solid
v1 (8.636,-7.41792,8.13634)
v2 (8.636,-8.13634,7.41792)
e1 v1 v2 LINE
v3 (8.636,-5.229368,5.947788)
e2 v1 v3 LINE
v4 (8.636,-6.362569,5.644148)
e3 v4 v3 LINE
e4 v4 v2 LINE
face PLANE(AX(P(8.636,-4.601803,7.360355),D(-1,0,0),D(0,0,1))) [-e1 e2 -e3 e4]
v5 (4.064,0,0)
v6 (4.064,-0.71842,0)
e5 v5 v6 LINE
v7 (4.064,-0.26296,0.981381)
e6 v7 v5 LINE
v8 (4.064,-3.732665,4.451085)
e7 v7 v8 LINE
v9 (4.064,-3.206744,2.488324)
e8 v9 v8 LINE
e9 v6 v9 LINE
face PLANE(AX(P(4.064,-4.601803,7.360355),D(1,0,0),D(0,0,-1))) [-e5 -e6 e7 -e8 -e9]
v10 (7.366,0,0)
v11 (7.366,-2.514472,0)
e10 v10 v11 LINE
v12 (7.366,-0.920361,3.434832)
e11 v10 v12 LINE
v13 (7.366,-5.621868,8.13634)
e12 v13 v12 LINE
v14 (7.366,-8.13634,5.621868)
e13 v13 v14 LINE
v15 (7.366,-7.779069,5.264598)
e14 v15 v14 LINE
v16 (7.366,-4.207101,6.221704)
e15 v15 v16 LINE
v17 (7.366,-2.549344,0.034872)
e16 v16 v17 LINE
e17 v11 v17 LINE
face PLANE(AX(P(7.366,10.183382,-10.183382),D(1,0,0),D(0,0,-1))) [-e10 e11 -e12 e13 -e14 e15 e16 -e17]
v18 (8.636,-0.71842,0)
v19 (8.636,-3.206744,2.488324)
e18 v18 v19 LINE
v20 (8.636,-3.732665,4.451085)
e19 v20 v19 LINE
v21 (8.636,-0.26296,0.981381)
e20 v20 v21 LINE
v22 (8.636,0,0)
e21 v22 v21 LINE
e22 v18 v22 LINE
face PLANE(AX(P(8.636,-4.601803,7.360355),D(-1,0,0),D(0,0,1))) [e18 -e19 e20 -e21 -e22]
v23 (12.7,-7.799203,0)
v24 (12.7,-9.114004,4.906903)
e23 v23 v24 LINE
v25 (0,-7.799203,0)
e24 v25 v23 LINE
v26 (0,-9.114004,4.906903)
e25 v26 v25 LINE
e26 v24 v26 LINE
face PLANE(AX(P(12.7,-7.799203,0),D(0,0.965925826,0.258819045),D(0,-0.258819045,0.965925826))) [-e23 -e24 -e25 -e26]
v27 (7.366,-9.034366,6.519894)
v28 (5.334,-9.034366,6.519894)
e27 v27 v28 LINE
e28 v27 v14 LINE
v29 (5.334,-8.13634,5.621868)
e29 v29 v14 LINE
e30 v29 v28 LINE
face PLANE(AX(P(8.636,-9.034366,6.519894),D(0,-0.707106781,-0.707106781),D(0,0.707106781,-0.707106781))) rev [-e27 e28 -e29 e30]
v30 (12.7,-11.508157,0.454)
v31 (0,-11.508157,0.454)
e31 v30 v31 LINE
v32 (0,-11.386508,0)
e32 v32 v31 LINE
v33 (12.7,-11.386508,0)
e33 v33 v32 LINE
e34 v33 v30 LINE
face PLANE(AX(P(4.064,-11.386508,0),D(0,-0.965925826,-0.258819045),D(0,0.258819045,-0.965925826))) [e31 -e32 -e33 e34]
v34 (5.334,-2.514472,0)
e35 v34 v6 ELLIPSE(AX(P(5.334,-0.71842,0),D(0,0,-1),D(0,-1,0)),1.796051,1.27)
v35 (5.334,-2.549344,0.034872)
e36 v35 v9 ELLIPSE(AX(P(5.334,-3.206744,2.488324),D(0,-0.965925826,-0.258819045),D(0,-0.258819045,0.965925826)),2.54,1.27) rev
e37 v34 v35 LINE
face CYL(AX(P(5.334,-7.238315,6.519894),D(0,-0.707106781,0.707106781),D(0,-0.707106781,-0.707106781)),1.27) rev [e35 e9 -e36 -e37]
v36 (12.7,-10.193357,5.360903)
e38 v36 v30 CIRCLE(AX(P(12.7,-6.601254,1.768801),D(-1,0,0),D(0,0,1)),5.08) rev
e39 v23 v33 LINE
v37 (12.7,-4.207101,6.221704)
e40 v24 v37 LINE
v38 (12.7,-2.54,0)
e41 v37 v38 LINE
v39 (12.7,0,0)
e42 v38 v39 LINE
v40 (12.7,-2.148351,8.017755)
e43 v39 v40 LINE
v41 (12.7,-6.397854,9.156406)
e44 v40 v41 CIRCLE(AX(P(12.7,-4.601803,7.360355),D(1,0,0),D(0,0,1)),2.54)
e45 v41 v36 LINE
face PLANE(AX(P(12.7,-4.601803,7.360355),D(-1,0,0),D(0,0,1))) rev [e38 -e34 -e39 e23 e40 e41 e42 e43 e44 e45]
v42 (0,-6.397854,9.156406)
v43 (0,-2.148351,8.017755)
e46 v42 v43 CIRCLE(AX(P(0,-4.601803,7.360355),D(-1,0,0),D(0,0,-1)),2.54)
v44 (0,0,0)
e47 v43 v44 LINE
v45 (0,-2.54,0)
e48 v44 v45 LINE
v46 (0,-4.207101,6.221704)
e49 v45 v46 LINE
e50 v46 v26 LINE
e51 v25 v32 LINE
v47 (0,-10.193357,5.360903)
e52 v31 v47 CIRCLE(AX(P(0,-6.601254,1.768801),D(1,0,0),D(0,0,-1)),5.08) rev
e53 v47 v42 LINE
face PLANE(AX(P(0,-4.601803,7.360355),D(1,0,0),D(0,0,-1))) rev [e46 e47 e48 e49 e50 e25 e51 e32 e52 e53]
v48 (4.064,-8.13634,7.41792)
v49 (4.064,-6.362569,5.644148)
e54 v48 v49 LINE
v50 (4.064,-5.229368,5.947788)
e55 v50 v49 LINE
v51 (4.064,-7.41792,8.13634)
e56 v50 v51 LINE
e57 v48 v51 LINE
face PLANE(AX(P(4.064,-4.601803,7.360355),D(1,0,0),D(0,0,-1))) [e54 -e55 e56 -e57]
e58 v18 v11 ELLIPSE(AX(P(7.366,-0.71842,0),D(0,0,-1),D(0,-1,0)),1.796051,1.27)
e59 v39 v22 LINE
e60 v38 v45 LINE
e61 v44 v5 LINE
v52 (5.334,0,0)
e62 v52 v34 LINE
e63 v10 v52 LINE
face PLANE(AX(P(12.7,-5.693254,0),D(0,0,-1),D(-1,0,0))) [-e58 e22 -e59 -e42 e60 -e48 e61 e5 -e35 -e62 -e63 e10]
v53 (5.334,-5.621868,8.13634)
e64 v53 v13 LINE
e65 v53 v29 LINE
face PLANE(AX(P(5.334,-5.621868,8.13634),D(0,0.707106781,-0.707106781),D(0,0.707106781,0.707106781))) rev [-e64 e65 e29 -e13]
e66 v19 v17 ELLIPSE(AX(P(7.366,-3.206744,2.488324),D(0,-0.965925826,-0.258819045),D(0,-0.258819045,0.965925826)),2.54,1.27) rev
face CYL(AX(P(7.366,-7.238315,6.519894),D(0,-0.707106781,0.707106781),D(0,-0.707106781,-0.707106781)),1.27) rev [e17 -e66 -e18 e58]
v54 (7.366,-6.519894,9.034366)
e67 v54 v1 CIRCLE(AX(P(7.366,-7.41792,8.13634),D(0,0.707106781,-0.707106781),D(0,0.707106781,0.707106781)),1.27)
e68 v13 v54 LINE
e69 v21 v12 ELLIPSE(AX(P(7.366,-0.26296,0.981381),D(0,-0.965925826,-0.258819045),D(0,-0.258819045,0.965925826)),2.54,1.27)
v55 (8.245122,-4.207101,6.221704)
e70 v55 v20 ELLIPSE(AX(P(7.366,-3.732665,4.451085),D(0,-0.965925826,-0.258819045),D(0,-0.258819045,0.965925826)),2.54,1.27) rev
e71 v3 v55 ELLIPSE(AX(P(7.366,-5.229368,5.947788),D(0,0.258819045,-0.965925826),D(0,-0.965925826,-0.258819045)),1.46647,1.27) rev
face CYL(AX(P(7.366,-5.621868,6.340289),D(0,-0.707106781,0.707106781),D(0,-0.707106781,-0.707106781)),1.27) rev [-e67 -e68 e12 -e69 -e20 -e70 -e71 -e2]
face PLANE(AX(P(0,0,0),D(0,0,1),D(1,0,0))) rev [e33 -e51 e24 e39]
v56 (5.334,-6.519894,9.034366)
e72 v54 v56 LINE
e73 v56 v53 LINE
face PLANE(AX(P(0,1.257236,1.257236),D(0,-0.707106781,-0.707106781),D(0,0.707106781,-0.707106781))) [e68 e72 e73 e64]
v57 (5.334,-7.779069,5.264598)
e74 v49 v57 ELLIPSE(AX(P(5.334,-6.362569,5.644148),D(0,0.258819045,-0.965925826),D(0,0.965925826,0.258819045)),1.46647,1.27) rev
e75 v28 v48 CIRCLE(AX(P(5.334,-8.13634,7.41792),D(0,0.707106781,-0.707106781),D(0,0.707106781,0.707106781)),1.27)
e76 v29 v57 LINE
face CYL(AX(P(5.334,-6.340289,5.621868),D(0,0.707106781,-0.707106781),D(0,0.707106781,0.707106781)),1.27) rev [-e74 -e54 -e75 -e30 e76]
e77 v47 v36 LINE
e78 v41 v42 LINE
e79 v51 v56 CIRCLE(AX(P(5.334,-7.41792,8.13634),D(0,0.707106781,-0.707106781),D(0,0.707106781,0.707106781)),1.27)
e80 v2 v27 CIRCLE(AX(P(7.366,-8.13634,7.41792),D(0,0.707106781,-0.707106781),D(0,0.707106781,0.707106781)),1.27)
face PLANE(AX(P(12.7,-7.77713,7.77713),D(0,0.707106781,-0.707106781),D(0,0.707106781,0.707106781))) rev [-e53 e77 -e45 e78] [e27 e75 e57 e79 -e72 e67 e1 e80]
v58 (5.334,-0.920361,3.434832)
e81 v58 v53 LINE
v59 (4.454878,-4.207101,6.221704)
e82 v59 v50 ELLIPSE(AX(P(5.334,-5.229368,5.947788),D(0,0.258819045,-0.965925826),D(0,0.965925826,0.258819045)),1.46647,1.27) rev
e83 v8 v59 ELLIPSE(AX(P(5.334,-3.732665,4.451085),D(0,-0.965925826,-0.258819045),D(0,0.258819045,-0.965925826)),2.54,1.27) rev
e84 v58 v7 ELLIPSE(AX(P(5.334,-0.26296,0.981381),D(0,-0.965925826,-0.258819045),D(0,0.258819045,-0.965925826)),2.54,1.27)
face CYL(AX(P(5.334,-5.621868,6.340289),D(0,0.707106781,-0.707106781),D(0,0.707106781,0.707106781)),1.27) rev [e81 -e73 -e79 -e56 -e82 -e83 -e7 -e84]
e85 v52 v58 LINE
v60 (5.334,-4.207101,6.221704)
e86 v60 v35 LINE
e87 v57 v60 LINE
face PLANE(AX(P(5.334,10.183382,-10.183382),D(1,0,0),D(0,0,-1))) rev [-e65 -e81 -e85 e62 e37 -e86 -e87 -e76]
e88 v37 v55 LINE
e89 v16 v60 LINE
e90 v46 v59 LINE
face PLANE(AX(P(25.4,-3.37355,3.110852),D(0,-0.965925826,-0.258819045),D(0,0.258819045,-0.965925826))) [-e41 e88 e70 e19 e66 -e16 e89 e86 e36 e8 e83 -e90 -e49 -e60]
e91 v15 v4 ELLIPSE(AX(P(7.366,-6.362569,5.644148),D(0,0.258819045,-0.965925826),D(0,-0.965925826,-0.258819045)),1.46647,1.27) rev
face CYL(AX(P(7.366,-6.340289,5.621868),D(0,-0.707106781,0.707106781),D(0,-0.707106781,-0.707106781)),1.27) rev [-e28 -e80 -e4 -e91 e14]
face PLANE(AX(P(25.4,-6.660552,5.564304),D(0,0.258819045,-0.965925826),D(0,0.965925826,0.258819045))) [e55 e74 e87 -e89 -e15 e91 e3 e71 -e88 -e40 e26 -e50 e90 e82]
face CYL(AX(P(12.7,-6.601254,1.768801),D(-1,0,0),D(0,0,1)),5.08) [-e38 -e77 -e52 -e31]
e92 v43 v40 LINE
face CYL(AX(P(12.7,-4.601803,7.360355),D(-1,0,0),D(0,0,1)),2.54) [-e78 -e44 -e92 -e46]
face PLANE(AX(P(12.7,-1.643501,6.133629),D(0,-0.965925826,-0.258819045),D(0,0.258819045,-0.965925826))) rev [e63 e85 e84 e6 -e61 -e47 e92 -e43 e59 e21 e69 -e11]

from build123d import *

# Parameters (mm, degrees)
BOSS_EXTRUDE1_START   = -3.302
BOSS_EXTRUDE1_DEPTH   = 4.572
BOSS_EXTRUDE1_START_2 = -2.032
BOSS_EXTRUDE1_2_DEPTH = 3.302
BOSS_EXTRUDE1_START_3 = -10.998522628
BOSS_EXTRUDE1_3_DEPTH = 11.998522628
BOSS_EXTRUDE1_4_DEPTH = 3.444411758
SKETCH2_W             = 2.032
SKETCH2_H             = 1.27
CUT_EXTRUDE1_DEPTH    = 3.556
BOSS_EXTRUDE2_DEPTH   = 1.27
BOSS_EXTRUDE3_DEPTH   = 4.064
BOSS_EXTRUDE4_DEPTH   = 1.27
BOSS_EXTRUDE5_START   = 1.27
BOSS_EXTRUDE5_DEPTH   = 1.27
SKETCH7_W             = 8.636
SKETCH7_H             = 3.587305501
BOSS_EXTRUDE6_DEPTH   = 4.16775137
BOSS_EXTRUDE7_START   = 4.064
BOSS_EXTRUDE7_DEPTH   = 4.064
DRAFT1_DEPTH          = 12.7
DRAFT2_START          = -7.533451599
DRAFT2_OUTLINE_W      = 12.7
DRAFT2_OUTLINE_H      = 6.098582272
DRAFT2_DEPTH          = 5.08
FILLET1_R             = 1.27
FILLET2_R             = 5.08


with BuildPart() as part:
    # Boss-Extrude1: read off the stored shape, not the designer's step
    # Boss-Extrude1 outline → Boss-Extrude1 (new body)
    with BuildSketch(Plane(origin=(7.366, 0, 0), x_dir=(0, 0, -1), z_dir=(1, 0, 0)).offset(BOSS_EXTRUDE1_START)):
        with BuildLine():
            Line((-6.519894076, -9.03436579), (-5.264597758, -7.779069472))
            Line((-5.264597758, -7.779069472), (-6.221703947, -4.207100548))
            Line((-6.221703947, -4.207100548), (0, -2.54))
            Line((0, -2.54), (0, 0))
            Line((0, 0), (-8.017755171, -2.148351023))
            ThreePointArc((-8.017755171, -2.148351023), (-9.813806395, -3.944402247), (-9.156406021, -6.397853846))
            Line((-9.156406021, -6.397853846), (-6.519894076, -9.03436579))
        make_face()
    extrude(amount=BOSS_EXTRUDE1_DEPTH)

    # Boss-Extrude1 2 outline → Boss-Extrude1 2 (add)
    with BuildSketch(Plane(origin=(7.366, 0, 0), x_dir=(0, 0, -1), z_dir=(1, 0, 0)).offset(BOSS_EXTRUDE1_START_2)):
        Polygon((-4.16775137, -11.386508497), (-4.16775137, -7.799202996), (-5.259202996, -7.799202996), (-5.264597758, -7.779069472), (-6.519894076, -9.03436579), align=None)
    extrude(amount=BOSS_EXTRUDE1_2_DEPTH)

    # Boss-Extrude1 3 outline → Boss-Extrude1 3 (cut)
    with BuildSketch(Plane(origin=(0, 0, 0), x_dir=(1, 0, 0), z_dir=(0, 0.707106781186548, -0.707106781186547)).offset(BOSS_EXTRUDE1_START_3)):
        with BuildLine():
            Line((7.366, 1.778), (7.366, -6))
            Line((7.366, -6), (8.636000001, -6))
            Line((8.636000001, -6), (8.636000002, -4.490590949))
            Line((8.636000002, -4.490590949), (8.636, 0.508))
            ThreePointArc((8.636, 0.508), (8.264025612, 1.406025612), (7.366, 1.778))
        make_face()
        with BuildLine():
            Line((4.063999999, -6), (5.334, -6))
            Line((5.334, -6), (5.334, 1.778))
            ThreePointArc((5.334, 1.778), (4.435974388, 1.406025612), (4.064, 0.508))
            Line((4.064, 0.508), (4.064, -4.490590949))
            Line((4.064, -4.490590949), (4.063999999, -6))
        make_face()
    extrude(amount=BOSS_EXTRUDE1_3_DEPTH, mode=Mode.SUBTRACT)

    # Boss-Extrude1 4 outline → Boss-Extrude1 4 (cut)
    with BuildSketch(Plane(origin=(0, 0, 0), x_dir=(1, 0, 0), z_dir=(0, 0.707106781186548, -0.707106781186547)).offset(BOSS_EXTRUDE1_START_3)):
        with BuildLine():
            Line((8.636, 1.778), (7.366, 1.778))
            ThreePointArc((7.366, 1.778), (8.264025612, 1.406025612), (8.636, 0.508))
            Line((8.636, 0.508), (8.636, 1.778))
        make_face()
        with BuildLine():
            ThreePointArc((4.064, 0.508), (4.435974388, 1.406025612), (5.334, 1.778))
            Line((5.334, 1.778), (4.064, 1.778))
            Line((4.064, 1.778), (4.064, 0.508))
        make_face()
    extrude(amount=BOSS_EXTRUDE1_4_DEPTH, mode=Mode.SUBTRACT)

    # Sketch2 → Cut-Extrude1 (cut)
    with BuildSketch(Plane(origin=(0, -1.257235857, -1.257235857), x_dir=(1, 0, 0), z_dir=(0, -0.707106781186547, -0.707106781186548))):
        with Locations((6.35, 10.363522628)):
            Rectangle(SKETCH2_W, SKETCH2_H)
    extrude(amount=-CUT_EXTRUDE1_DEPTH, mode=Mode.SUBTRACT)

    # Sketch3 → Boss-Extrude2 (add)
    with BuildSketch(Plane(origin=(7.366, 0, 0), x_dir=(0, 0, -1), z_dir=(1, 0, 0))):
        with BuildLine():
            Line((-3.434832238, -0.920360524), (-9.03436579, -6.519894076))
            Line((-9.03436579, -6.519894076), (-9.156406021, -6.397853846))
            ThreePointArc((-9.156406021, -6.397853846), (-9.813806395, -3.944402247), (-8.017755171, -2.148351023))
            Line((-8.017755171, -2.148351023), (-3.434832238, -0.920360524))
        make_face()
    extrude(amount=BOSS_EXTRUDE2_DEPTH)

    # Sketch4 → Boss-Extrude3 (add)
    with BuildSketch(Plane(origin=(8.636, 0, 0), x_dir=(0, 0, -1), z_dir=(1, 0, 0))):
        with BuildLine():
            Line((-4.16775137, -11.386508497), (-9.156406021, -6.397853846))
            ThreePointArc((-9.156406021, -6.397853846), (-9.813806395, -3.944402247), (-8.017755171, -2.148351023))
            Line((-8.017755171, -2.148351023), (0, 0))
            Line((0, 0), (0, -2.54))
            Line((0, -2.54), (-6.221703947, -4.207100548))
            Line((-6.221703947, -4.207100548), (-5.259202996, -7.799202996))
            Line((-5.259202996, -7.799202996), (-4.16775137, -7.799202996))
            Line((-4.16775137, -7.799202996), (-4.16775137, -11.386508497))
        make_face()
    extrude(amount=BOSS_EXTRUDE3_DEPTH)

    # Sketch5 → Boss-Extrude4 (add)
    with BuildSketch(Plane.ZY.offset(-5.334)):
        Polygon((4.16775137, -11.386508497), (4.16775137, -7.799202996), (5.259202996, -7.799202996), (5.264597758, -7.779069472), (6.519894076, -9.03436579), align=None)
    extrude(amount=BOSS_EXTRUDE4_DEPTH)

    # Sketch6 → Boss-Extrude5 (add)
    with BuildSketch(Plane.ZY.offset(-5.334).offset(BOSS_EXTRUDE5_START)):
        with BuildLine():
            Line((9.156406021, -6.397853846), (9.03436579, -6.519894076))
            Line((9.03436579, -6.519894076), (3.434832238, -0.920360524))
            Line((3.434832238, -0.920360524), (8.017755171, -2.148351023))
            ThreePointArc((8.017755171, -2.148351023), (9.813806395, -3.944402247), (9.156406021, -6.397853846))
        make_face()
    extrude(amount=-BOSS_EXTRUDE5_DEPTH)

    # Sketch7 → Boss-Extrude6 (add)
    with BuildSketch(Plane(origin=(0, 0, 4.16775137), x_dir=(-1, 0, 0), z_dir=(0, 0, -1))):
        with Locations((-8.382, -9.592855747)):
            Rectangle(SKETCH7_W, SKETCH7_H)
    extrude(amount=BOSS_EXTRUDE6_DEPTH)

    # Sketch8 → Boss-Extrude7 (add)
    with BuildSketch(Plane.ZY.offset(-4.064).offset(BOSS_EXTRUDE7_START)):
        with BuildLine():
            Line((4.16775137, -11.386508497), (0, -11.386508497))
            Line((0, -11.386508497), (0, -7.799202996))
            Line((0, -7.799202996), (5.259202996, -7.799202996))
            Line((5.259202996, -7.799202996), (6.221703947, -4.207100548))
            Line((6.221703947, -4.207100548), (0, -2.54))
            Line((0, -2.54), (0, 0))
            Line((0, 0), (8.017755171, -2.148351023))
            ThreePointArc((8.017755171, -2.148351023), (9.813806395, -3.944402247), (9.156406021, -6.397853846))
            Line((9.156406021, -6.397853846), (4.16775137, -11.386508497))
        make_face()
    extrude(amount=-BOSS_EXTRUDE7_DEPTH)

    # Draft1: read off the stored shape, not the designer's step
    # Draft1 outline → Draft1 (add)
    with BuildSketch(Plane.YZ):
        Polygon((-11.386508497, 4.16775137), (-12.267257994, 3.287001873), (-11.386508497, 0), align=None)
    extrude(amount=DRAFT1_DEPTH)

    # Draft2: read off the stored shape, not the designer's step
    # Draft2 outline → Draft2 (cut)
    with BuildSketch(Plane(origin=(0, 0, 0), x_dir=(1, 0, 0), z_dir=(0, 0.9659258262890691, 0.2588190451025181)).offset(DRAFT2_START)):
        with Locations((6.35, -4.049291136)):
            Rectangle(DRAFT2_OUTLINE_W, DRAFT2_OUTLINE_H)
    extrude(amount=DRAFT2_DEPTH, mode=Mode.SUBTRACT)

    # Fillet1
    # the kernel refuses this fillet: 1.27 mm, written as the material it adds along each edge
    with BuildSketch(Plane(origin=(8.636, 1.324703506, 1.189768208), x_dir=(-1, 0, 0), z_dir=(0, -0.7071067811865481, 0.707106781186547))) as fillet1_piece_1_section:
        with BuildLine():
            CenterArc((FILLET1_R, FILLET1_R), FILLET1_R, 180, 90)
            Line((0, FILLET1_R), (0, 0))
            Line((0, 0), (FILLET1_R, 0))
        make_face()
    fillet1_piece_1 = extrude(amount=11.093936292, mode=Mode.PRIVATE)
    fillet1_piece_1 = split(fillet1_piece_1, bisect_by=Plane(origin=(8.636, -0.303841036, 7.267579181), z_dir=(0, 0.2588190451025224, -0.9659258262890679)), keep=Keep.TOP, mode=Mode.PRIVATE)
    fillet1_piece_1 = split(fillet1_piece_1, bisect_by=Plane(origin=(8.636, -0.208703743, 0.778892974), z_dir=(0, -0.9659258262890681, -0.2588190451025218)), keep=Keep.TOP, mode=Mode.PRIVATE)
    fillet1_piece_1 = split(fillet1_piece_1, bisect_by=Plane(origin=(8.636, -2.578556006, 0.143892974), z_dir=(0, 0.9659258262890685, 0.2588190451025197)), keep=Keep.TOP, mode=Mode.PRIVATE)
    add(fillet1_piece_1)
    with BuildSketch(Plane(origin=(8.636, 1.324703506, 1.189768208), x_dir=(-1, 0, 0), z_dir=(0, -0.7071067811865481, 0.707106781186547))) as fillet1_piece_2_section:
        with BuildLine():
            CenterArc((FILLET1_R, FILLET1_R), FILLET1_R, 180, 90)
            Line((0, FILLET1_R), (0, 0))
            Line((0, 0), (FILLET1_R, 0))
        make_face()
    fillet1_piece_2 = extrude(amount=11.093936292, mode=Mode.PRIVATE)
    fillet1_piece_2 = split(fillet1_piece_2, bisect_by=Plane(origin=(8.636, -0.303841036, 7.267579181), z_dir=(0, -0.2588190451025224, 0.9659258262890679)), keep=Keep.TOP, mode=Mode.PRIVATE)
    fillet1_piece_2 = split(fillet1_piece_2, bisect_by=Plane(origin=(8.636, -2.578556006, 0.143892974), z_dir=(0, 0.9659258262890685, 0.2588190451025197)), keep=Keep.TOP, mode=Mode.PRIVATE)
    add(fillet1_piece_2)
    with BuildSketch(Plane(origin=(8.636, 1.324703506, 1.189768208), x_dir=(-1, 0, 0), z_dir=(0, -0.7071067811865481, 0.707106781186547))) as fillet1_piece_3_section:
        with BuildLine():
            CenterArc((FILLET1_R, FILLET1_R), FILLET1_R, 180, 90)
            Line((0, FILLET1_R), (0, 0))
            Line((0, 0), (FILLET1_R, 0))
        make_face()
    fillet1_piece_3 = extrude(amount=11.093936292, mode=Mode.PRIVATE)
    fillet1_piece_3 = split(fillet1_piece_3, bisect_by=Plane(origin=(8.636, -0.303841036, 7.267579181), z_dir=(0, -0.2588190451025224, 0.9659258262890679)), keep=Keep.TOP, mode=Mode.PRIVATE)
    fillet1_piece_3 = split(fillet1_piece_3, bisect_by=Plane(origin=(8.636, -2.578556006, 0.143892974), z_dir=(0, -0.9659258262890685, -0.2588190451025197)), keep=Keep.TOP, mode=Mode.PRIVATE)
    add(fillet1_piece_3)
    with BuildSketch(Plane(origin=(4.064, -5.534005442, 3.019533728), x_dir=(1, 0, 0), z_dir=(0, -0.707106781186547, 0.707106781186548))) as fillet1_piece_4_section:
        with BuildLine():
            CenterArc((FILLET1_R, FILLET1_R), FILLET1_R, 180, 90)
            Line((0, FILLET1_R), (0, 0))
            Line((0, 0), (FILLET1_R, 0))
        make_face()
    fillet1_piece_4 = extrude(amount=4.950257078, mode=Mode.PRIVATE)
    fillet1_piece_4 = split(fillet1_piece_4, bisect_by=Plane(origin=(4.064, -6.245662223, 5.675472992), z_dir=(0, -0.2588190451025224, 0.9659258262890679)), keep=Keep.TOP, mode=Mode.PRIVATE)
    add(fillet1_piece_4)
    with BuildSketch(Plane(origin=(4.064, -6.519894076, 9.03436579), x_dir=(1, 0, 0), z_dir=(0, 0.7071067811865481, -0.707106781186547))) as fillet1_piece_5_section:
        with BuildLine():
            CenterArc((FILLET1_R, FILLET1_R), FILLET1_R, 180, 90)
            Line((0, FILLET1_R), (0, 0))
            Line((0, 0), (FILLET1_R, 0))
        make_face()
    fillet1_piece_5 = extrude(amount=11.093936292, mode=Mode.PRIVATE)
    fillet1_piece_5 = split(fillet1_piece_5, bisect_by=Plane(origin=(4.064, -5.065193799, 9.424151555), z_dir=(0, -0.965925826289068, -0.2588190451025222)), keep=Keep.TOP, mode=Mode.PRIVATE)
    fillet1_piece_5 = split(fillet1_piece_5, bisect_by=Plane(origin=(4.064, -5.661800826, 5.831918182), z_dir=(0, -0.2588190451025224, 0.9659258262890679)), keep=Keep.TOP, mode=Mode.PRIVATE)
    add(fillet1_piece_5)
    with BuildSketch(Plane(origin=(4.064, -6.519894076, 9.03436579), x_dir=(1, 0, 0), z_dir=(0, 0.7071067811865481, -0.707106781186547))) as fillet1_piece_6_section:
        with BuildLine():
            CenterArc((FILLET1_R, FILLET1_R), FILLET1_R, 180, 90)
            Line((0, FILLET1_R), (0, 0))
            Line((0, 0), (FILLET1_R, 0))
        make_face()
    fillet1_piece_6 = extrude(amount=11.093936292, mode=Mode.PRIVATE)
    fillet1_piece_6 = split(fillet1_piece_6, bisect_by=Plane(origin=(4.064, -5.065193799, 9.424151555), z_dir=(0, 0.965925826289068, 0.2588190451025222)), keep=Keep.TOP, mode=Mode.PRIVATE)
    fillet1_piece_6 = split(fillet1_piece_6, bisect_by=Plane(origin=(4.064, -5.661800826, 5.831918182), z_dir=(0, -0.2588190451025224, 0.9659258262890679)), keep=Keep.TOP, mode=Mode.PRIVATE)
    add(fillet1_piece_6)
    with BuildSketch(Plane(origin=(4.064, -6.519894076, 9.03436579), x_dir=(1, 0, 0), z_dir=(0, 0.7071067811865481, -0.707106781186547))) as fillet1_piece_7_section:
        with BuildLine():
            CenterArc((FILLET1_R, FILLET1_R), FILLET1_R, 180, 90)
            Line((0, FILLET1_R), (0, 0))
            Line((0, 0), (FILLET1_R, 0))
        make_face()
    fillet1_piece_7 = extrude(amount=11.093936292, mode=Mode.PRIVATE)
    fillet1_piece_7 = split(fillet1_piece_7, bisect_by=Plane(origin=(4.064, -5.065193799, 9.424151555), z_dir=(0, 0.965925826289068, 0.2588190451025222)), keep=Keep.TOP, mode=Mode.PRIVATE)
    fillet1_piece_7 = split(fillet1_piece_7, bisect_by=Plane(origin=(4.064, -5.661800826, 5.831918182), z_dir=(0, 0.2588190451025224, -0.9659258262890679)), keep=Keep.TOP, mode=Mode.PRIVATE)
    fillet1_piece_7 = split(fillet1_piece_7, bisect_by=Plane(origin=(4.064, -2.695341536, 10.059151555), z_dir=(0, -0.9659258262890681, -0.2588190451025218)), keep=Keep.TOP, mode=Mode.PRIVATE)
    add(fillet1_piece_7)
    with BuildSketch(Plane(origin=(8.636, -9.03436579, 6.519894076), x_dir=(-1, 0, 0), z_dir=(0, 0.707106781186548, -0.7071067811865471))) as fillet1_piece_8_section:
        with BuildLine():
            CenterArc((FILLET1_R, FILLET1_R), FILLET1_R, 180, 90)
            Line((0, FILLET1_R), (0, 0))
            Line((0, 0), (FILLET1_R, 0))
        make_face()
    fillet1_piece_8 = extrude(amount=4.950257078, mode=Mode.PRIVATE)
    fillet1_piece_8 = split(fillet1_piece_8, bisect_by=Plane(origin=(8.636, -8.636452802, 5.034862587), z_dir=(0, -0.2588190451025224, 0.9659258262890679)), keep=Keep.TOP, mode=Mode.PRIVATE)
    add(fillet1_piece_8)

    # Fillet2
    fillet2_edges = [part.edges().sort_by_distance(p)[0] for p in [
        (6.35, -12.267257994, 3.287001873),
    ]]
    fillet(fillet2_edges, radius=FILLET2_R)


solid = part.part
